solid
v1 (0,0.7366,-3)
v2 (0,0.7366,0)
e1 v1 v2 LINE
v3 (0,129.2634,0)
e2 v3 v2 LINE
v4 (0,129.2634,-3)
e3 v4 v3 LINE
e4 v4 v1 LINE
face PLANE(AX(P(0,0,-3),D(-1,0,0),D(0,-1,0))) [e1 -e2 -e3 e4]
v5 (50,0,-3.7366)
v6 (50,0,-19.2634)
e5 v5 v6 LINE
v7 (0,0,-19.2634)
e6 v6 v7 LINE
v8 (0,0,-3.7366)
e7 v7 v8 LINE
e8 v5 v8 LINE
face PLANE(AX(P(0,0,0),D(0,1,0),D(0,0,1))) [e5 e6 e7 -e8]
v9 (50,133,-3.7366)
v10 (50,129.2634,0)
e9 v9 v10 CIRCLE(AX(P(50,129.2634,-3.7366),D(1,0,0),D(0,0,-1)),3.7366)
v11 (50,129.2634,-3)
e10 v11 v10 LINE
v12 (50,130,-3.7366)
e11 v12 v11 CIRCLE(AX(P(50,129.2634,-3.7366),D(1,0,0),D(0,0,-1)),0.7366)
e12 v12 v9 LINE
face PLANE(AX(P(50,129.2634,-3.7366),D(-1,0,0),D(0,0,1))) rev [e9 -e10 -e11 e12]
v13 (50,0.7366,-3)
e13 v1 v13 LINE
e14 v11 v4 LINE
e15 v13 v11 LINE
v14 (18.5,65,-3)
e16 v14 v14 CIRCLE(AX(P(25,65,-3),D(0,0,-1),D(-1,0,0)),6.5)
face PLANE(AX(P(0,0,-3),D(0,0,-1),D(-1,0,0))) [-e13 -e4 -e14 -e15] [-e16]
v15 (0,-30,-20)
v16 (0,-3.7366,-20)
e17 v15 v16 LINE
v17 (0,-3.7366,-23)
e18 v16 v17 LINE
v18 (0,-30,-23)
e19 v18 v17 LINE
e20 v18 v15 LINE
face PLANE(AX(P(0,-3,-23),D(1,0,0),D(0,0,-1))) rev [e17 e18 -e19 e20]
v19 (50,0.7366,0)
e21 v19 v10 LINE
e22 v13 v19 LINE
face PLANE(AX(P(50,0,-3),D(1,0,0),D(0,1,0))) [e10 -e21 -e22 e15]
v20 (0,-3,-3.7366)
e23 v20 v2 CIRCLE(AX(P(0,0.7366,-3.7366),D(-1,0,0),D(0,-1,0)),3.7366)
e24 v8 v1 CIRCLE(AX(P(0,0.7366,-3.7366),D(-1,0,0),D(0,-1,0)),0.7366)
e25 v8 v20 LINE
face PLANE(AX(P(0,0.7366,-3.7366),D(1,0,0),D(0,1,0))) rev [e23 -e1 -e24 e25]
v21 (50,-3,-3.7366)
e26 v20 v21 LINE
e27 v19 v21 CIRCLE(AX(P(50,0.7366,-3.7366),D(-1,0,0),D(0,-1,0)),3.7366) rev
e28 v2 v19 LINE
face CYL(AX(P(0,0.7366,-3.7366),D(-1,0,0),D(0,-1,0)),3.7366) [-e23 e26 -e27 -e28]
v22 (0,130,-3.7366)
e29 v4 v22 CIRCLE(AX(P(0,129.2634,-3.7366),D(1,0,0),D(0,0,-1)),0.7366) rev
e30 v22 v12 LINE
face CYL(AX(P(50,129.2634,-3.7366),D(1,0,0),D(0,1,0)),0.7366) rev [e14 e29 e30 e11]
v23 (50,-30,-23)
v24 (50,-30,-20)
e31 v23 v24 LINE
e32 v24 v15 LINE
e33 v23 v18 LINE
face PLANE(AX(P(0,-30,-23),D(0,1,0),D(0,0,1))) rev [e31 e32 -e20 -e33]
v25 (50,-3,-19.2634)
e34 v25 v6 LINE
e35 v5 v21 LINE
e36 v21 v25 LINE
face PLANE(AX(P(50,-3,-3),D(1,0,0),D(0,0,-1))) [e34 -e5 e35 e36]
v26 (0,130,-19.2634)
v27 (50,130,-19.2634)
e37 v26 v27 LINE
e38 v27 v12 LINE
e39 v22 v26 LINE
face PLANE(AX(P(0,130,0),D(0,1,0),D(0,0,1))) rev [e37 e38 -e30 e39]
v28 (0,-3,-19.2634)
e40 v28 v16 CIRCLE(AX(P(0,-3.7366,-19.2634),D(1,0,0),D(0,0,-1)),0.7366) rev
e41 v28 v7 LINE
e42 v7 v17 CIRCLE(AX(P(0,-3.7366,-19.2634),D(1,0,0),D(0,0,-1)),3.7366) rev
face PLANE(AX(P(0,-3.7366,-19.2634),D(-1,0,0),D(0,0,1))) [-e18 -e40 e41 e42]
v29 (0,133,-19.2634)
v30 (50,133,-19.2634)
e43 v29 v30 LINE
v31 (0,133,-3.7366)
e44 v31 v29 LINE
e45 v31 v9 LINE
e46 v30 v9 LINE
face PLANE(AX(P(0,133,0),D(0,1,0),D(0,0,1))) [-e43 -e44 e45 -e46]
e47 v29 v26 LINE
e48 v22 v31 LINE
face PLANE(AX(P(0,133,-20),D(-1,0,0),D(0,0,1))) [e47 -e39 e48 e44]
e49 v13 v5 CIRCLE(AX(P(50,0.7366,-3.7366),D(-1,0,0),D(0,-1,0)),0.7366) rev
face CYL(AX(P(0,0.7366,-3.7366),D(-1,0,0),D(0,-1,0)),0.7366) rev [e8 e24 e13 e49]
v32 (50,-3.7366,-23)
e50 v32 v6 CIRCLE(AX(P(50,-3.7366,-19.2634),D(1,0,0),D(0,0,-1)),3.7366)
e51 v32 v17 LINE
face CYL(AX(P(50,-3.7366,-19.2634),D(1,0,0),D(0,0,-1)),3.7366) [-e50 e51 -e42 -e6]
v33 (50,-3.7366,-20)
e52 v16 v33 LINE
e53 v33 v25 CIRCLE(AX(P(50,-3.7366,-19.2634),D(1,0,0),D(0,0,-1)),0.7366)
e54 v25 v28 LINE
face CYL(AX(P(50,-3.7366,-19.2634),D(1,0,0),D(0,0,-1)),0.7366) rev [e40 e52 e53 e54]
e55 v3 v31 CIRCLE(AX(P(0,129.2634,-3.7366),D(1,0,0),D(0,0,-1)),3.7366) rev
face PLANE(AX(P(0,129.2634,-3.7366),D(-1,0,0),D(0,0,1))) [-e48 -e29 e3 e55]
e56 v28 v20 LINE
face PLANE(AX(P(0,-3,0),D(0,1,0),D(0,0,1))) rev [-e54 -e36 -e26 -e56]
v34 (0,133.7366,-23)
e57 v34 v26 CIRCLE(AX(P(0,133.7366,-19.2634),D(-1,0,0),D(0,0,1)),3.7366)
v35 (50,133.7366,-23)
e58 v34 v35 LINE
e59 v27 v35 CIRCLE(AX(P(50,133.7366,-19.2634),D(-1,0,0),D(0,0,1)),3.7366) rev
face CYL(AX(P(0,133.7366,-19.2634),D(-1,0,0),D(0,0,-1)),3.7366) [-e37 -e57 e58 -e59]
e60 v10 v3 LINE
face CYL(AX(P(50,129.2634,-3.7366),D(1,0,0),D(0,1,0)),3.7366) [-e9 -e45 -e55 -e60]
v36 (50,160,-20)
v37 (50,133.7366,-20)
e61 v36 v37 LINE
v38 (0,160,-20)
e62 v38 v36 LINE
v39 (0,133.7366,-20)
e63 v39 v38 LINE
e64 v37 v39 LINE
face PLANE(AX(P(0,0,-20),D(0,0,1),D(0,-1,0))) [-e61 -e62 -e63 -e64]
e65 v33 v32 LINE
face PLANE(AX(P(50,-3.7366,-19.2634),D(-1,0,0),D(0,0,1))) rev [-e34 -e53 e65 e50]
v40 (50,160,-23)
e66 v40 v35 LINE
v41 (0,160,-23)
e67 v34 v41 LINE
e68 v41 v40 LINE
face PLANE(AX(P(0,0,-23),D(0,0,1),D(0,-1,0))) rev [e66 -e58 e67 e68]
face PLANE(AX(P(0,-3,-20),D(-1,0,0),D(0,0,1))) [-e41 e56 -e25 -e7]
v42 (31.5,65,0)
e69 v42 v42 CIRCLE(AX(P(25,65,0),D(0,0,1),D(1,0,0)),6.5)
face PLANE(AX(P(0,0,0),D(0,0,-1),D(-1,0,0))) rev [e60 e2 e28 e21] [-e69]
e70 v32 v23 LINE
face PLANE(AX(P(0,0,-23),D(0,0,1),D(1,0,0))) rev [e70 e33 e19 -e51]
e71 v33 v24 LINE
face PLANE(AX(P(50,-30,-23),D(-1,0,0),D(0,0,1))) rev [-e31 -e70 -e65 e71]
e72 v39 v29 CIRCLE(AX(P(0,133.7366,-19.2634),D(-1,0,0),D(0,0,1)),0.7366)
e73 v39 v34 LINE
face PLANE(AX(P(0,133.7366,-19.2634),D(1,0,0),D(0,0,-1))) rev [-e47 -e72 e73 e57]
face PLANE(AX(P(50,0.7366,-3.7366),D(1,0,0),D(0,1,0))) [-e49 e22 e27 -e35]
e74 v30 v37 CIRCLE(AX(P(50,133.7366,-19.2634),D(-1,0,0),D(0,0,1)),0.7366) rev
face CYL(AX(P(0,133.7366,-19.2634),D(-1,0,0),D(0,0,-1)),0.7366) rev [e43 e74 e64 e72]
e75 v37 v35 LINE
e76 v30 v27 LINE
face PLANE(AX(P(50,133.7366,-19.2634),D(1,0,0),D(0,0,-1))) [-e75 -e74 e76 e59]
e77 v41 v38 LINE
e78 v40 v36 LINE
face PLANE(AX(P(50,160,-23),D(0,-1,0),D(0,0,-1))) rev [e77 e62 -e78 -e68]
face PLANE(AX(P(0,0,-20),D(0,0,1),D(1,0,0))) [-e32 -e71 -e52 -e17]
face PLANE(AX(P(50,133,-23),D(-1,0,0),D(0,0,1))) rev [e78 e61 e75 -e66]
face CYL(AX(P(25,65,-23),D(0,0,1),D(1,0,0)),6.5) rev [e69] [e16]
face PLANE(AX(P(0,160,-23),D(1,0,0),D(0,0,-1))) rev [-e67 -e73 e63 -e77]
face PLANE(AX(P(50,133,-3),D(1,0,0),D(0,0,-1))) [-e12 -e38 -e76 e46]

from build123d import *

# Parameters (mm, degrees)
SKETCH_1_W                         = 50
SKETCH_1_H                         = 130
SM_BASE_FLANGE_1_DEPTH             = 3
SM_EDGE_FLANGE_1_STRIP_W           = 13.4732
SM_EDGE_FLANGE_1_STRIP_H           = 3
SM_EDGE_FLANGE_1_STRIP_CUT_DEPTH   = 50
SM_EDGE_FLANGE_1_STRIP_2_W         = 13.4732
SM_EDGE_FLANGE_1_STRIP_2_H         = 3
SM_EDGE_FLANGE_1_STRIP_CUT_2_DEPTH = 50
SM_EDGE_FLANGE_1_DEPTH             = 50
SM_EDGE_FLANGE_1_BEND_DEPTH        = 50
SM_EDGE_FLANGE_2_STRIP_W           = 13.4732
SM_EDGE_FLANGE_2_STRIP_H           = 3
SM_EDGE_FLANGE_2_STRIP_CUT_DEPTH   = 50
SM_EDGE_FLANGE_2_STRIP_2_W         = 13.4732
SM_EDGE_FLANGE_2_STRIP_2_H         = 3
SM_EDGE_FLANGE_2_STRIP_CUT_2_DEPTH = 50
SM_EDGE_FLANGE_2_DEPTH             = 50
SM_EDGE_FLANGE_2_BEND_DEPTH        = 50
SKETCH_18_R                        = 6.5
CUT_EXTRUDE_1_DEPTH                = 170.201063826


# Sheet-metal steps are written as plain solids
with BuildPart() as part:
    # Sketch 1 → 基体-法兰1 (new body)
    with BuildSketch(Plane.XY):
        with Locations((25, 65)):
            Rectangle(SKETCH_1_W, SKETCH_1_H)
    extrude(amount=-SM_BASE_FLANGE_1_DEPTH)

    # 边线-法兰1 strip (across the edge) → 边线-法兰1 strip cut (cut)
    with BuildSketch(Plane(origin=(0, 130, -3), x_dir=(0, -1, 0), z_dir=(1, 0, 0))):
        with Locations((-6, -1.5)):
            Rectangle(SM_EDGE_FLANGE_1_STRIP_W, SM_EDGE_FLANGE_1_STRIP_H)
    extrude(amount=SM_EDGE_FLANGE_1_STRIP_CUT_DEPTH, mode=Mode.SUBTRACT)

    # 边线-法兰1 strip 2 (across the edge) → 边线-法兰1 strip cut 2 (cut)
    with BuildSketch(Plane(origin=(50, 0, -3), x_dir=(0, 1, 0), z_dir=(-1, 0, 0))):
        with Locations((-6, -1.5)):
            Rectangle(SM_EDGE_FLANGE_1_STRIP_2_W, SM_EDGE_FLANGE_1_STRIP_2_H)
    extrude(amount=SM_EDGE_FLANGE_1_STRIP_CUT_2_DEPTH, mode=Mode.SUBTRACT)

    # 边线-法兰1 section (across the edge) → 边线-法兰1 (add)
    with BuildSketch(Plane(origin=(0, 130, -3), x_dir=(0, -1, 0), z_dir=(1, 0, 0))):
        with BuildLine():
            Line((-3, 0.7366), (-3, 17))
            Line((-3, 17), (0, 17))
            Line((0, 17), (0, 0.7366))
            ThreePointArc((0, 0.7366), (0.215745145, 0.215745145), (0.7366, 0))
            Line((0.7366, 0), (0.7366, -3))
            ThreePointArc((0.7366, -3), (-1.905575199, -1.905575199), (-3, 0.7366))
        make_face()
    extrude(amount=SM_EDGE_FLANGE_1_DEPTH)

    # 边线-法兰1 section 2 (across the edge) → 边线-法兰1 bend (add)
    with BuildSketch(Plane(origin=(50, 0, -3), x_dir=(0, 1, 0), z_dir=(-1, 0, 0))):
        with BuildLine():
            Line((-3, 0.7366), (-3, 17))
            Line((-3, 17), (0, 17))
            Line((0, 17), (0, 0.7366))
            ThreePointArc((0, 0.7366), (0.215745145, 0.215745145), (0.7366, 0))
            Line((0.7366, 0), (0.7366, -3))
            ThreePointArc((0.7366, -3), (-1.905575199, -1.905575199), (-3, 0.7366))
        make_face()
    extrude(amount=SM_EDGE_FLANGE_1_BEND_DEPTH)

    # 边线-法兰2 strip (across the edge) → 边线-法兰2 strip cut (cut)
    with BuildSketch(Plane(origin=(0, -3, -20), x_dir=(0, 0, 1), z_dir=(1, 0, 0))):
        with Locations((-6, -1.5)):
            Rectangle(SM_EDGE_FLANGE_2_STRIP_W, SM_EDGE_FLANGE_2_STRIP_H)
    extrude(amount=SM_EDGE_FLANGE_2_STRIP_CUT_DEPTH, mode=Mode.SUBTRACT)

    # 边线-法兰2 strip 2 (across the edge) → 边线-法兰2 strip cut 2 (cut)
    with BuildSketch(Plane(origin=(50, 133, -20), x_dir=(0, 0, 1), z_dir=(-1, 0, 0))):
        with Locations((-6, -1.5)):
            Rectangle(SM_EDGE_FLANGE_2_STRIP_2_W, SM_EDGE_FLANGE_2_STRIP_2_H)
    extrude(amount=SM_EDGE_FLANGE_2_STRIP_CUT_2_DEPTH, mode=Mode.SUBTRACT)

    # 边线-法兰2 section (across the edge) → 边线-法兰2 (add)
    with BuildSketch(Plane(origin=(0, -3, -20), x_dir=(0, 0, 1), z_dir=(1, 0, 0))):
        with BuildLine():
            Line((-3, 0.7366), (-3, 27))
            Line((-3, 27), (0, 27))
            Line((0, 27), (0, 0.7366))
            ThreePointArc((0, 0.7366), (0.215745145, 0.215745145), (0.7366, 0))
            Line((0.7366, 0), (0.7366, -3))
            ThreePointArc((0.7366, -3), (-1.905575199, -1.905575199), (-3, 0.7366))
        make_face()
    extrude(amount=SM_EDGE_FLANGE_2_DEPTH)

    # 边线-法兰2 section 2 (across the edge) → 边线-法兰2 bend (add)
    with BuildSketch(Plane(origin=(50, 133, -20), x_dir=(0, 0, 1), z_dir=(-1, 0, 0))):
        with BuildLine():
            Line((-3, 0.7366), (-3, 27))
            Line((-3, 27), (0, 27))
            Line((0, 27), (0, 0.7366))
            ThreePointArc((0, 0.7366), (0.215745145, 0.215745145), (0.7366, 0))
            Line((0.7366, 0), (0.7366, -3))
            ThreePointArc((0.7366, -3), (-1.905575199, -1.905575199), (-3, 0.7366))
        make_face()
    extrude(amount=SM_EDGE_FLANGE_2_BEND_DEPTH)

    # 草图18 → 切除-拉伸1 (cut, through all)
    with BuildSketch(Plane.XY):
        with Locations((25, 65)):
            Circle(SKETCH_18_R)
    extrude(amount=-CUT_EXTRUDE_1_DEPTH, mode=Mode.SUBTRACT)


solid = part.part
